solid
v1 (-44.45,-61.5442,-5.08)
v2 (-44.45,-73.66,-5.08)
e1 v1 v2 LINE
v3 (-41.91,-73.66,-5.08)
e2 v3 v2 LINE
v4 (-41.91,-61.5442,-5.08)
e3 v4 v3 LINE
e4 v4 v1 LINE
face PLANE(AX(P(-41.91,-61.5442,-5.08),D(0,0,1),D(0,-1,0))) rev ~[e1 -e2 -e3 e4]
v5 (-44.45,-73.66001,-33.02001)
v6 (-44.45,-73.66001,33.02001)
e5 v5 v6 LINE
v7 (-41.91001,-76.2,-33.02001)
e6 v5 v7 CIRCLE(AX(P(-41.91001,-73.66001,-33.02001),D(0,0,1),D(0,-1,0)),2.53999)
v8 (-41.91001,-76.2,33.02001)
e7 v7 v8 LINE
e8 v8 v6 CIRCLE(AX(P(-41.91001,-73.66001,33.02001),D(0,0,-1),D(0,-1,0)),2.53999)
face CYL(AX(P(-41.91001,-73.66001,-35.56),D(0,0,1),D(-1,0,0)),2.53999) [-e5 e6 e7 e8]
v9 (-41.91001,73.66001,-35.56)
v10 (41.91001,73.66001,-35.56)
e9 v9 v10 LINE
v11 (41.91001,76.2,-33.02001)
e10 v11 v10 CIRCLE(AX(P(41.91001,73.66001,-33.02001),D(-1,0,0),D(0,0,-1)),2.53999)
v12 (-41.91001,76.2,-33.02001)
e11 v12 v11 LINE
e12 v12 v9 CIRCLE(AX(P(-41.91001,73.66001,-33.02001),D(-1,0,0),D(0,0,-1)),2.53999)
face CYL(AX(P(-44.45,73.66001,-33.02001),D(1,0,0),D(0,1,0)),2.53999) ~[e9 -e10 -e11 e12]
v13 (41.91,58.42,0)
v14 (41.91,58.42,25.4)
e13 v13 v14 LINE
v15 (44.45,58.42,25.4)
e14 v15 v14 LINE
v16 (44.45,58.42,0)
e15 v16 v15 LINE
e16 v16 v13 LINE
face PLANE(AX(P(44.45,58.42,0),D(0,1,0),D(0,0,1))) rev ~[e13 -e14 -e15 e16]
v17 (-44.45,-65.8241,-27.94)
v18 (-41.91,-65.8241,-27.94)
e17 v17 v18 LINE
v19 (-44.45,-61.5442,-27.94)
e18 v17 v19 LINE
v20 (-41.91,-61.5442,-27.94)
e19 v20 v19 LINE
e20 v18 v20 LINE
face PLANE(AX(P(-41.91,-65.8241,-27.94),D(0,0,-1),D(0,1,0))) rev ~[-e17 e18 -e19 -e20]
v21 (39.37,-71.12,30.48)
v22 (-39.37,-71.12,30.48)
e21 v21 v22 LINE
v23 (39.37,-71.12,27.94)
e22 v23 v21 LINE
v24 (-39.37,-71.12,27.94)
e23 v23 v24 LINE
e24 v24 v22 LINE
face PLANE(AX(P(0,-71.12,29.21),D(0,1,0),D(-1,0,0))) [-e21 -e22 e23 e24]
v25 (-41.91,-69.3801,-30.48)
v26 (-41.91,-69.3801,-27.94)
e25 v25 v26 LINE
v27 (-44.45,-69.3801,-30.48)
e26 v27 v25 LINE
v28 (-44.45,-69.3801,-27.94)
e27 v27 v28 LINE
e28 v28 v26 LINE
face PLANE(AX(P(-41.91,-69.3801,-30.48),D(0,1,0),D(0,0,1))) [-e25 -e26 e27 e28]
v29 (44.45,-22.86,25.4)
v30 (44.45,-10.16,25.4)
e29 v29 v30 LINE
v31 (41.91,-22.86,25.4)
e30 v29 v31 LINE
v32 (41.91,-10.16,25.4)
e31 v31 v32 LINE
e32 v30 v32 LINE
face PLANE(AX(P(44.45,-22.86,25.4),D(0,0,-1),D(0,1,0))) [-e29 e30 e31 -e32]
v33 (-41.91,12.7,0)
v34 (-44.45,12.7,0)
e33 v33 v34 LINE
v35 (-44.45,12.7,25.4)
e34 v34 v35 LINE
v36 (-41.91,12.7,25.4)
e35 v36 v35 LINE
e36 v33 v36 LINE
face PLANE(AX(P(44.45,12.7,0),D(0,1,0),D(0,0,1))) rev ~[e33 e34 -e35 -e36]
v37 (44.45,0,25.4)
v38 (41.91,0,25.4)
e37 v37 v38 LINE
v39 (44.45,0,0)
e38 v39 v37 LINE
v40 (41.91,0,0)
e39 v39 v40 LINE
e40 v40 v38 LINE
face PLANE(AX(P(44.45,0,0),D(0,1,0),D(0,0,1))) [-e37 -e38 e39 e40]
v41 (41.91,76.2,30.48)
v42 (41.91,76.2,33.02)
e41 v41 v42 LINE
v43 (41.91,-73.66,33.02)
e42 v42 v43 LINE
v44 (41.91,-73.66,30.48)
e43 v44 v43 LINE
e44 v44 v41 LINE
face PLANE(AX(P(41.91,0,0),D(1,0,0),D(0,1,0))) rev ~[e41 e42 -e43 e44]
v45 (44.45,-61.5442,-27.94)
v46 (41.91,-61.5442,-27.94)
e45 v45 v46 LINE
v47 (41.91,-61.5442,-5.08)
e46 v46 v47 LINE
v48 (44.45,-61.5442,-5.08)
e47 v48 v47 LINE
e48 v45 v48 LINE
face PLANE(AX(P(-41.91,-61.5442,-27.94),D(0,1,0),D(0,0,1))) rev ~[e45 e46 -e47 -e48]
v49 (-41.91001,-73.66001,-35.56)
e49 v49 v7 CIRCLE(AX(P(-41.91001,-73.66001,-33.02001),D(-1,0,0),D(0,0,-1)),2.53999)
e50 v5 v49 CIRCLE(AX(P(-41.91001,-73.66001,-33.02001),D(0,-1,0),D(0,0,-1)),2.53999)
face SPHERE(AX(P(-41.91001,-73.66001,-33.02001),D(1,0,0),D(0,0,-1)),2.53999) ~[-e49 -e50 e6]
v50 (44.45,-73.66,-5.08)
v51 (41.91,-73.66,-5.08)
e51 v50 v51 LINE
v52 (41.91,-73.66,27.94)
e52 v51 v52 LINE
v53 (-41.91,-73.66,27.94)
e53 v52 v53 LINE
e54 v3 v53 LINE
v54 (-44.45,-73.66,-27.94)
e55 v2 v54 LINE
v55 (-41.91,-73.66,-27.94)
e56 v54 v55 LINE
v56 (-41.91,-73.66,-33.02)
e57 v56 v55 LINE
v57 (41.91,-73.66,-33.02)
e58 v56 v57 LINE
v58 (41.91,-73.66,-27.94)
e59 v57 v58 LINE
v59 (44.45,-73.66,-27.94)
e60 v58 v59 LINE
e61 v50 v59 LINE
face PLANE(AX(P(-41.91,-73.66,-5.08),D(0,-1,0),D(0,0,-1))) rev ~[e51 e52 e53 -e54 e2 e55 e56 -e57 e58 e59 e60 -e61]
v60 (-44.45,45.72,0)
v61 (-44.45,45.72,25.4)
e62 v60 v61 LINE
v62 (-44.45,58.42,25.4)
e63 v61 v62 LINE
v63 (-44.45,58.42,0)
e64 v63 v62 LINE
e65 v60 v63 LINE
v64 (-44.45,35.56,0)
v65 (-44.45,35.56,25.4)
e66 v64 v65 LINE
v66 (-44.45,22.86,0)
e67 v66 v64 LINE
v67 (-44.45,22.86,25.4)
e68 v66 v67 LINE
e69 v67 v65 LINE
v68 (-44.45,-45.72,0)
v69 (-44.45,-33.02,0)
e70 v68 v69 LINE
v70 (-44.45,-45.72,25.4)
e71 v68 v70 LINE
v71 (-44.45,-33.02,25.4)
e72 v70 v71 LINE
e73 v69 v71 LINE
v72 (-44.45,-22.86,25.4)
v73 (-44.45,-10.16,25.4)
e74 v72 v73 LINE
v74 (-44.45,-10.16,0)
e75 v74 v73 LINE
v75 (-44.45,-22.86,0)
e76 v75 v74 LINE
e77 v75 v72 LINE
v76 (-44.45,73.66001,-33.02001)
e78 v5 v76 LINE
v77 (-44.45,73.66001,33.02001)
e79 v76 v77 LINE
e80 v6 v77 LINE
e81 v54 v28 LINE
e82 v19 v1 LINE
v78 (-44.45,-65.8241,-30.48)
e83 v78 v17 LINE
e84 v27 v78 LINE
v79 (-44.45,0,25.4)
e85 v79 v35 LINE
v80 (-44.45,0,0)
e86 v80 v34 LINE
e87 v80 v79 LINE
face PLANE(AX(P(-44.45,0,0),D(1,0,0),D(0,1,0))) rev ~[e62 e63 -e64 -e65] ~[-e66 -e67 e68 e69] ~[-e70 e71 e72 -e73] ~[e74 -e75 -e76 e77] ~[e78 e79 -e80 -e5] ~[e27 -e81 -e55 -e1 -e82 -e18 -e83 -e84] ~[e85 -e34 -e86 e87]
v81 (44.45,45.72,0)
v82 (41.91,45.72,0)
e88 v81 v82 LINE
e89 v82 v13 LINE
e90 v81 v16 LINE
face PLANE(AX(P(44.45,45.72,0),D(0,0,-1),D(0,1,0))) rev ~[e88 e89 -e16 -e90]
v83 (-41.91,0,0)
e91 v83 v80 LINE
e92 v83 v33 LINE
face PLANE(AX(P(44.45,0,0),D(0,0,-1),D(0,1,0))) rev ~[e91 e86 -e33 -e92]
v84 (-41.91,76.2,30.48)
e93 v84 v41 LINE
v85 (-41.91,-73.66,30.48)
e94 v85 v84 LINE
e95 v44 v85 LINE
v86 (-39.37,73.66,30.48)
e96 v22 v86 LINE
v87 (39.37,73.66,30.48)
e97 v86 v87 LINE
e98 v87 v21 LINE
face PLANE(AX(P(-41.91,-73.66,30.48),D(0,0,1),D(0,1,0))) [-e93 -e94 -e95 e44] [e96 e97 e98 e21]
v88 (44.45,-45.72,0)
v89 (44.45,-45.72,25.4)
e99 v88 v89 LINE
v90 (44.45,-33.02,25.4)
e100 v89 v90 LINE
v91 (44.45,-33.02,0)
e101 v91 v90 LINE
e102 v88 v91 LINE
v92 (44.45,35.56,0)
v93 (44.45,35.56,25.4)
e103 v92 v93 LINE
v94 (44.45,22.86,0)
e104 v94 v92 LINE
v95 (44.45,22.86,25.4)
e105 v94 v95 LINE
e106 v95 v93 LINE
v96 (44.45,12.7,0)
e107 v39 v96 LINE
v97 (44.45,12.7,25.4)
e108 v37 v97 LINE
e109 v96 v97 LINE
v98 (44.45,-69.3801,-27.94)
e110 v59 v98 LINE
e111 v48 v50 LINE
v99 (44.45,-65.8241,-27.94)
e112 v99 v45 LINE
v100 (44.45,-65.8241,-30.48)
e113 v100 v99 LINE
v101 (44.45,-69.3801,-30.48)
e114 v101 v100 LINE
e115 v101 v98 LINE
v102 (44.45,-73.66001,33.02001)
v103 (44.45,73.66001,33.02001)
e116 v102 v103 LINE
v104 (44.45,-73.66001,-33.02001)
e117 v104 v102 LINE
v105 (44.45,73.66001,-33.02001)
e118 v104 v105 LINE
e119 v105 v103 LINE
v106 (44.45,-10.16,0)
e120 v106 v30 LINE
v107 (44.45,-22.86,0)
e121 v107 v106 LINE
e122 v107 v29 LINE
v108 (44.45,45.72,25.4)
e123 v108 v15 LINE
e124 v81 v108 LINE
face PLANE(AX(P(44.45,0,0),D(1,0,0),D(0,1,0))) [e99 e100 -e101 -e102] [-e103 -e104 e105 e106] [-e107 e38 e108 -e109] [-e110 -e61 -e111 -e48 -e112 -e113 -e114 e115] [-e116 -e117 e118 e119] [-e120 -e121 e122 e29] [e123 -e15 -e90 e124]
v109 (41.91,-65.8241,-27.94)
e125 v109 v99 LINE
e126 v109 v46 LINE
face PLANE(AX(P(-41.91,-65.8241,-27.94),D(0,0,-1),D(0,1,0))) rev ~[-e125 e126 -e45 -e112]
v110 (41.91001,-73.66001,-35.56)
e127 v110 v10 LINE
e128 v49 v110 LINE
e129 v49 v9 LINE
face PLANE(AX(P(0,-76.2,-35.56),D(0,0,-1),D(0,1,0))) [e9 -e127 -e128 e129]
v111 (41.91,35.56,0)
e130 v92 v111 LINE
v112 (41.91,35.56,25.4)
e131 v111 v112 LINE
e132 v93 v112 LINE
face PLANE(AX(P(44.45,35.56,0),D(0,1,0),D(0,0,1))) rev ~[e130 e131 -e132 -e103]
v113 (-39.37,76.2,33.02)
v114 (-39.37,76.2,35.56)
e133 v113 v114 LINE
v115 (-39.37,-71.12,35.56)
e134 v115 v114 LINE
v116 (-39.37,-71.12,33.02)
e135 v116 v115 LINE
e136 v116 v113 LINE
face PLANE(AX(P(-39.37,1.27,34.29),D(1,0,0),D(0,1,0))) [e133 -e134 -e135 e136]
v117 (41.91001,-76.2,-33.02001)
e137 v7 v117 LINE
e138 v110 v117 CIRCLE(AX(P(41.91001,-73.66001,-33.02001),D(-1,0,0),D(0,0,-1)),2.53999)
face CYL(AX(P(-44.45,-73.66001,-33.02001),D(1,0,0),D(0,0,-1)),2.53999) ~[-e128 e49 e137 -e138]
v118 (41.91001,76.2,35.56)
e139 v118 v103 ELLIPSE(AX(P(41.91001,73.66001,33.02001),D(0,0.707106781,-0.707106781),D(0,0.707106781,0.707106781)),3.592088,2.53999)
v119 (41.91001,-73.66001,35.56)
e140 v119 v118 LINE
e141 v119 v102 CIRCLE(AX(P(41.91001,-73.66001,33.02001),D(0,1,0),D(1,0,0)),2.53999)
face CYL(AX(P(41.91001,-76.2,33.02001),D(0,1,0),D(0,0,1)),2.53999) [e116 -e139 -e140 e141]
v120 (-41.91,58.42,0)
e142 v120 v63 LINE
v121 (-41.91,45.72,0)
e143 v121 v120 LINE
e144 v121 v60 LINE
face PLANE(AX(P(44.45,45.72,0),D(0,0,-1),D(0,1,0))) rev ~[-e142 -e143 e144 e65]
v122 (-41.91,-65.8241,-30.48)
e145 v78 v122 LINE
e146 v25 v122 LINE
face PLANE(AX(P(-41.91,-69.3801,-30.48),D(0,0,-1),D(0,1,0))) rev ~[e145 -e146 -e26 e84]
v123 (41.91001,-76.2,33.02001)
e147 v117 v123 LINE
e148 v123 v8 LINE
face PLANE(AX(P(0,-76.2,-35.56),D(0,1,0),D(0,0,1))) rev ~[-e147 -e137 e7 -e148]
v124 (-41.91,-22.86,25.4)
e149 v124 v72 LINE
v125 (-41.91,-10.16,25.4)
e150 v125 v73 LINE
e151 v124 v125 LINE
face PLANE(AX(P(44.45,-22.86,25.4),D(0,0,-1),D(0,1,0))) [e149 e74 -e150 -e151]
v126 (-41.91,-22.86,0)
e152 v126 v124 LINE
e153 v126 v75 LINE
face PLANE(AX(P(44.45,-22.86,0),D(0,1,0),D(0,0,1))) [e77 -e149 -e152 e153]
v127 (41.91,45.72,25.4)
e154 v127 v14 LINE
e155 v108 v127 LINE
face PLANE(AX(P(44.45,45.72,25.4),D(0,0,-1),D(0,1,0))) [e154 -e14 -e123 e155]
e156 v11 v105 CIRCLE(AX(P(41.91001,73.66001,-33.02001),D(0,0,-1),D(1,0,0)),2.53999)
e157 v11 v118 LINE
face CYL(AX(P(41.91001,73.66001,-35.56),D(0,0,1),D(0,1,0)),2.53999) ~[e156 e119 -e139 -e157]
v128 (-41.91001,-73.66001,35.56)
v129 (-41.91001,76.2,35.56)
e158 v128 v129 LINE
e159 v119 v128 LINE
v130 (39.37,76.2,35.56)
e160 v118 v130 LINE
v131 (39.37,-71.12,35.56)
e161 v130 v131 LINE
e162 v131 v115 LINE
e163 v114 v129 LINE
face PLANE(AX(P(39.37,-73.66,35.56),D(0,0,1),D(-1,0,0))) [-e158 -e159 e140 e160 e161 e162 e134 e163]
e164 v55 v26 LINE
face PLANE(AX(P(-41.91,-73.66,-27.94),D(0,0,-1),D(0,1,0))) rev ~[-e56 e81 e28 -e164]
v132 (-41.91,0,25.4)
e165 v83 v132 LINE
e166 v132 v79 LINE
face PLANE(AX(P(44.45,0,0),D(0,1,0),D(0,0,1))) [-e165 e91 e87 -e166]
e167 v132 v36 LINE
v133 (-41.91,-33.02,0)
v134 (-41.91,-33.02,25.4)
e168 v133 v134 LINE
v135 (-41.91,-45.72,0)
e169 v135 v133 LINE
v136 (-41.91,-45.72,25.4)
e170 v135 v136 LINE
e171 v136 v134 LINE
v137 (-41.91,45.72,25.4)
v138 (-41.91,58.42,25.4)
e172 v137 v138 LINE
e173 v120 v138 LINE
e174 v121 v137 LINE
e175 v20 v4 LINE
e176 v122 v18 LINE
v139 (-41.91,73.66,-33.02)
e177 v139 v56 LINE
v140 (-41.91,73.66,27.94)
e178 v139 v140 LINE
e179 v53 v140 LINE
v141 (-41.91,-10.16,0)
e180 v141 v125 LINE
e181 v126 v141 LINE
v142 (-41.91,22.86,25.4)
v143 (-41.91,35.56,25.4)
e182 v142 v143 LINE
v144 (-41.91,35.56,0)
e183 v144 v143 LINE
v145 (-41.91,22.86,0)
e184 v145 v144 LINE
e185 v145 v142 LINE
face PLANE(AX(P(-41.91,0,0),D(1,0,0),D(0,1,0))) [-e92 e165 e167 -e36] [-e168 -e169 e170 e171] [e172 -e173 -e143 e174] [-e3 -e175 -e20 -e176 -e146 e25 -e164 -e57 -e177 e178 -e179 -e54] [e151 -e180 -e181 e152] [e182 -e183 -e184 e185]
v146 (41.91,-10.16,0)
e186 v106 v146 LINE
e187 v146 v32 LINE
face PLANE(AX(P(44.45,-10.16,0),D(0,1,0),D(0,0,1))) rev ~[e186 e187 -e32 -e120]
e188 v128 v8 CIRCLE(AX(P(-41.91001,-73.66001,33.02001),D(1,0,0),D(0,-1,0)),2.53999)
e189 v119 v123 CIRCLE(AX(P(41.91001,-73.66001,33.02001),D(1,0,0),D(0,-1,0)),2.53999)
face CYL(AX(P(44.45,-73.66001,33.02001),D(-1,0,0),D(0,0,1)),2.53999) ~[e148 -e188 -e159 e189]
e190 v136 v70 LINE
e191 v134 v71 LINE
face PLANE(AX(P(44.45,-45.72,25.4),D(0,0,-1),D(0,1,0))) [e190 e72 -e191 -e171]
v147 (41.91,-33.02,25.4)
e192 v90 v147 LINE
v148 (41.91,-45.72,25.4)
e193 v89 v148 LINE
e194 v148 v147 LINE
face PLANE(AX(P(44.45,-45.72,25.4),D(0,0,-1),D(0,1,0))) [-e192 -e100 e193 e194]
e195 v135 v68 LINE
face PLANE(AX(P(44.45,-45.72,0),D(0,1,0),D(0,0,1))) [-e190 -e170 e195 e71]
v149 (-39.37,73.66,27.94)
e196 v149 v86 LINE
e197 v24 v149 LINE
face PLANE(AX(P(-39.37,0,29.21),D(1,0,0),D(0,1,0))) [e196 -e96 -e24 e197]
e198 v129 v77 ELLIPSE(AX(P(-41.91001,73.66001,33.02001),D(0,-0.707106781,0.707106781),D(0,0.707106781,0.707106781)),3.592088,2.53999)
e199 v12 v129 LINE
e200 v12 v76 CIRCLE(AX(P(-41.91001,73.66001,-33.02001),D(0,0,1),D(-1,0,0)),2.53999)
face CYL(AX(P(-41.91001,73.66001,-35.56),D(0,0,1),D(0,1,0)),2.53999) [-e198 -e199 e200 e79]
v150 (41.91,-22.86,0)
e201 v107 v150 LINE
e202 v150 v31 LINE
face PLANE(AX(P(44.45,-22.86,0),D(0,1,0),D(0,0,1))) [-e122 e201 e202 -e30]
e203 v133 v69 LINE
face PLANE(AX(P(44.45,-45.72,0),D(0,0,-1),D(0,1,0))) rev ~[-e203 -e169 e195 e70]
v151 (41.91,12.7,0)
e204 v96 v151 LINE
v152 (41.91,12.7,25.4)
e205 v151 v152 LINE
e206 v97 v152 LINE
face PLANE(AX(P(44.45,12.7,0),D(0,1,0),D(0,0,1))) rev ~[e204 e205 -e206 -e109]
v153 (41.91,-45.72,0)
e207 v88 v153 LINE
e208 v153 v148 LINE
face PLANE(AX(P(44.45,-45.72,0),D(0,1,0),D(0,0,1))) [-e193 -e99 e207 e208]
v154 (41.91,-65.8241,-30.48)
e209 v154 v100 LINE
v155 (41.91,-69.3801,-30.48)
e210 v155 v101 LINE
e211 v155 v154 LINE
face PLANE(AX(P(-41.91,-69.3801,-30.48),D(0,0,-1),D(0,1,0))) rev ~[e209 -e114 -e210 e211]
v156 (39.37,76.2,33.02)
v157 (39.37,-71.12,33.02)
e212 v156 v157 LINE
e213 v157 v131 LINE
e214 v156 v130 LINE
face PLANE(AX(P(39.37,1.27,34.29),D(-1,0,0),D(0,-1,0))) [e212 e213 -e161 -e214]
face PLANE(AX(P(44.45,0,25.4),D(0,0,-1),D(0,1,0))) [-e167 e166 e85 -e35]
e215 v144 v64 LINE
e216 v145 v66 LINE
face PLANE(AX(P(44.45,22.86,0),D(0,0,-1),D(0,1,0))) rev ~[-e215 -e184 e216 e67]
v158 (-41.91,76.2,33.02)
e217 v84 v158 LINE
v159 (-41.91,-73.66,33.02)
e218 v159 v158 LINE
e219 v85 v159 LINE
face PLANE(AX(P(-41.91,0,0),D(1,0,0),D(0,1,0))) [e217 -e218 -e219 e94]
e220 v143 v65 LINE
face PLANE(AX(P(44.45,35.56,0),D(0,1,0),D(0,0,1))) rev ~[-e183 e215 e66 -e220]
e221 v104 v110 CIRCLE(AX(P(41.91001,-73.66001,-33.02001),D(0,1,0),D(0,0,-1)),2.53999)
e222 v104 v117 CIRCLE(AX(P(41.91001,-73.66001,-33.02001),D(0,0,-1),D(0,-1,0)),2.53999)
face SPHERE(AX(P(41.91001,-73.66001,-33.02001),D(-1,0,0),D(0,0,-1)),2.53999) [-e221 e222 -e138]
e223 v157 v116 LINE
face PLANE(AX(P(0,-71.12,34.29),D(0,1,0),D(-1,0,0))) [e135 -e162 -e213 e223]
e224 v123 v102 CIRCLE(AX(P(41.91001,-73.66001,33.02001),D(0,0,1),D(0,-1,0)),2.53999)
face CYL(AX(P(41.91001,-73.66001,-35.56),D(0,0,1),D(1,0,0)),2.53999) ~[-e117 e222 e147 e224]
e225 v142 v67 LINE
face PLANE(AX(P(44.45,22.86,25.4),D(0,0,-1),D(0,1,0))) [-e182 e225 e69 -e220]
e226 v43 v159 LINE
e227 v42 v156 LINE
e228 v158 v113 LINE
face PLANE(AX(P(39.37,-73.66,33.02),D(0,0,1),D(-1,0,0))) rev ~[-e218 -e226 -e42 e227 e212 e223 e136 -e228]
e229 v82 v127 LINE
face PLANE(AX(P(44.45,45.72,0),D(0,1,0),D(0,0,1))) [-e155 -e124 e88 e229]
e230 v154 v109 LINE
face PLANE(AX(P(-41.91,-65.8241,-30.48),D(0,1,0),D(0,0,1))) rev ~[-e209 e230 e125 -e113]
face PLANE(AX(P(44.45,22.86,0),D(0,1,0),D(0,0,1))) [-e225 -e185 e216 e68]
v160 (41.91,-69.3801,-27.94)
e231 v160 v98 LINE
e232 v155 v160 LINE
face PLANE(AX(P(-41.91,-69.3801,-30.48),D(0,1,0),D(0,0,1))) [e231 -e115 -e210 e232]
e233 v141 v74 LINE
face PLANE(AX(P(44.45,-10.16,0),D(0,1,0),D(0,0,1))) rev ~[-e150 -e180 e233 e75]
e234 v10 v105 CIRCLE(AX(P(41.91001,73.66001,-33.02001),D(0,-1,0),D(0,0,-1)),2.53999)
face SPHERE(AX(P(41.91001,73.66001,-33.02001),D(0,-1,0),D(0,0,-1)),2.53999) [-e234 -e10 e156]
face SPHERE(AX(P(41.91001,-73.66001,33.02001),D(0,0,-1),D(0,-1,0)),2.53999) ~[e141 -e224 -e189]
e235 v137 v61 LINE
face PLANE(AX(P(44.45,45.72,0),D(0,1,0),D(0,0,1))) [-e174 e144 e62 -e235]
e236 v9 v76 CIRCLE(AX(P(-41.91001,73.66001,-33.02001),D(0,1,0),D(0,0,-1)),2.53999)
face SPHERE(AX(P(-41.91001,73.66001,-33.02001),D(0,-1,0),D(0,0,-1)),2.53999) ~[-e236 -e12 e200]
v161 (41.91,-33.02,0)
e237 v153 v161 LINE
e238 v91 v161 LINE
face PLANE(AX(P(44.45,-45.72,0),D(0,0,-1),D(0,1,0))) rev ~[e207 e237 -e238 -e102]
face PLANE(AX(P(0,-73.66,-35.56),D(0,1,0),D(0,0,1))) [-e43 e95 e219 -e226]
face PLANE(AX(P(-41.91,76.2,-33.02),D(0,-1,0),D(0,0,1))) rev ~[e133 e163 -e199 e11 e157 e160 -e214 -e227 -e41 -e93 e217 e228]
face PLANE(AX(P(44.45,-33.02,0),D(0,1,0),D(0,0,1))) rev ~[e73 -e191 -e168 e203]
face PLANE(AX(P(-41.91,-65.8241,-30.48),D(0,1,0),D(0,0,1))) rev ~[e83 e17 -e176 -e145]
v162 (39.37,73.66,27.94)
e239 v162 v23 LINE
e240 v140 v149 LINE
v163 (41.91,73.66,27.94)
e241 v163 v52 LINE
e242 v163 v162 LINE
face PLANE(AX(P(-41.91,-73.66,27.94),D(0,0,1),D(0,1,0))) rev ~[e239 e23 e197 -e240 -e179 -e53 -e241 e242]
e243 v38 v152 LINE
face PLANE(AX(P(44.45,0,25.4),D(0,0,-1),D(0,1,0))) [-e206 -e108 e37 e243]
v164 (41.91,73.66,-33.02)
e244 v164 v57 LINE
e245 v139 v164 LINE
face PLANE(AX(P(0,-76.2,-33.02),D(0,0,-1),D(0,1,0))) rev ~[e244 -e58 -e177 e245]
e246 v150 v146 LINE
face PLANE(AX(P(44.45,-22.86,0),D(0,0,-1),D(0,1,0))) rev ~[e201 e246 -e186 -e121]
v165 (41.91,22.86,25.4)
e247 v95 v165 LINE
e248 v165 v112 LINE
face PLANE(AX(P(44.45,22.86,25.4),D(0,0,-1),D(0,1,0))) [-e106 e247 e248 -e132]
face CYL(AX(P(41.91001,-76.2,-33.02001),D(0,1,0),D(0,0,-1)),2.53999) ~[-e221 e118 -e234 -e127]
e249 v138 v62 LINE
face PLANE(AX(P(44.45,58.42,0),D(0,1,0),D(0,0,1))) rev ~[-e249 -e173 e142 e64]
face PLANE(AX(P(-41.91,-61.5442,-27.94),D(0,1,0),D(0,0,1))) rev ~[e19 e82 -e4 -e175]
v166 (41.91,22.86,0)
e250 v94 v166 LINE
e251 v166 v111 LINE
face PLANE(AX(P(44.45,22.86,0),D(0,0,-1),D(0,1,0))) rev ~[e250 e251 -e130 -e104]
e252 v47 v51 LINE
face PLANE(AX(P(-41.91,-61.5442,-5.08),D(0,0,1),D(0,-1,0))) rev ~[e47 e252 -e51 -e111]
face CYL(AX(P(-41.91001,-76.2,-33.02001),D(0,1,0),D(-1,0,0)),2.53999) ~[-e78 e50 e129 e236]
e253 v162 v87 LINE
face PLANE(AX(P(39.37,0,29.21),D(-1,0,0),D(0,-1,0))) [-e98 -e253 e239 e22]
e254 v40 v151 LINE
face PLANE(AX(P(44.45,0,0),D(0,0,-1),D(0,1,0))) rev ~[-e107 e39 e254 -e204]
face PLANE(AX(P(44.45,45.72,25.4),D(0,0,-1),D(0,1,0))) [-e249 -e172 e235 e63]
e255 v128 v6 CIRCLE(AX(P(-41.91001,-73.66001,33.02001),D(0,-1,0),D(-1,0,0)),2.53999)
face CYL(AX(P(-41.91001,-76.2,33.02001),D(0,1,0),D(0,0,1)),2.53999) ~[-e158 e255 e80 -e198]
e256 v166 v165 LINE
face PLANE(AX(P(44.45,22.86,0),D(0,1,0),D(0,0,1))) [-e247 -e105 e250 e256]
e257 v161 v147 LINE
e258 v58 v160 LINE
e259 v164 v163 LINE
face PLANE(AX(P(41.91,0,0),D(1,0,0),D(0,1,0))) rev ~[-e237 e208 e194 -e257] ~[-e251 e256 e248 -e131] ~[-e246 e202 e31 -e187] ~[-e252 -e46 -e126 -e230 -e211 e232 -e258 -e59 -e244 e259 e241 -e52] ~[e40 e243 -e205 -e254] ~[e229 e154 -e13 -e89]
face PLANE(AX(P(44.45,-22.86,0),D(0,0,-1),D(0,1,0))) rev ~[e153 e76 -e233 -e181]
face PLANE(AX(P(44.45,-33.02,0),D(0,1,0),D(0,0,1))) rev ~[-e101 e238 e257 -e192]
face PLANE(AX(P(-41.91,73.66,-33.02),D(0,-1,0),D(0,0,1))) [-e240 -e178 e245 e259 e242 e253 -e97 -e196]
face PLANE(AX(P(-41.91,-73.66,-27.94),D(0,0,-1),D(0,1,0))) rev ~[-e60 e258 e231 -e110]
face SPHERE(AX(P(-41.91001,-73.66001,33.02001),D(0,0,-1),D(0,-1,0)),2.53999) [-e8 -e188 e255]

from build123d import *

# Parameters (mm, degrees)
F0_W      = 152.4
F0_H      = 71.12
F1_DEPTH  = 44.45
F2_T      = -2.54
F3_W      = 2.54
F3_H      = 63.5
F4_DEPTH  = 83.82
F5_W      = 147.32
F5_H      = 2.54
F5_W_2    = 149.86
F6_DEPTH  = 2.54
F7_W      = 147.32
F7_H      = 2.54
F7_W_2    = 149.86
F8_DEPTH  = 2.54
F9_W      = 78.74
F9_H      = 2.54
F10_DEPTH = 2.54
F11_W     = 3.556
F11_H     = 2.54
F12_DEPTH = 127
F13_R     = 2.53999
F14_W     = 12.7
F14_H     = 25.4
F15_DEPTH = 254


# Not quite as in the source:
# - a fillet or chamfer is up to 0.001 mm smaller than in the source, because OpenCascade refuses the exact size


with BuildPart() as f1:
    # F0 (on Right) → F1 (new body, symmetric)
    with BuildSketch(Plane.YZ):
        Rectangle(F0_W, F0_H)
    extrude(amount=F1_DEPTH, both=True)

    # F2
    f2_openings = [f1.faces().sort_by_distance(p)[0] for p in [
        (0, 0, 35.56),
        (0, 76.2, 0),
    ]]
    offset(amount=F2_T, openings=f2_openings)

    # F3 (on face) → F4 (join, through all)
    with BuildSketch(Plane.YZ.offset(-41.91)):
        with Locations((74.93, -1.27)):
            Rectangle(F3_W, F3_H)
    extrude(amount=F4_DEPTH)

    # F5 (on face) → F6 (join)
    with BuildSketch(Plane(origin=(41.91, 0, 0), x_dir=(0, -1, 0), z_dir=(-1, 0, 0))):
        with Locations((0, 29.21)):
            Rectangle(F5_W, F5_H)
        with Locations((-1.27, 34.29)):
            Rectangle(F5_W_2, F5_H)
    extrude(amount=F6_DEPTH)

    # F7 (on face) → F8 (join)
    with BuildSketch(Plane.YZ.offset(-41.91)):
        with Locations((0, 29.21)):
            Rectangle(F7_W, F7_H)
        with Locations((1.27, 34.29)):
            Rectangle(F7_W_2, F7_H)
    extrude(amount=F8_DEPTH)

    # F9 (on face) → F10 (join)
    with BuildSketch(Plane(origin=(0, -73.66, 0), x_dir=(-1, 0, 0), z_dir=(0, 1, 0))):
        with Locations((0, 34.29)):
            Rectangle(F9_W, F9_H)
        with Locations((0, 29.21)):
            Rectangle(F9_W, F9_H)
    extrude(amount=F10_DEPTH)

    # F11 (on face) → F12 (cut, symmetric)
    with BuildSketch(Plane.YZ.offset(-41.91)):
        Polygon((-73.66, -5.08), (-73.66, -27.94), (-69.3801, -27.94), (-69.3801, -25.4), (-65.8241, -25.4), (-65.8241, -27.94), (-61.5442, -27.94), (-61.5442, -5.08), align=None)
        with Locations((-67.6021, -26.67)):
            Rectangle(F11_W, F11_H)
        with Locations((-67.6021, -29.21)):
            Rectangle(F11_W, F11_H)
    extrude(amount=F12_DEPTH, both=True, mode=Mode.SUBTRACT)

    # F13 (radius 2.54 in the source; OpenCascade refuses exactly that, so slightly less here)
    f13_edges = [f1.edges().sort_by_distance(p)[0] for p in [
        (0, -76.2, -35.56),
        (-44.45, 0, -35.56),
        (44.45, 0, -35.56),
        (44.45, -76.2, 0),
        (-44.45, -76.2, 0),
        (0, 76.2, -35.56),
        (44.45, 76.2, 0),
        (-44.45, 76.2, 0),
        (0, -76.2, 35.56),
        (44.45, 0, 35.56),
        (-44.45, 0, 35.56),
    ]]
    fillet(f13_edges, radius=F13_R)

    # F14 (on face) → F15 (cut)
    with BuildSketch(Plane.YZ.offset(44.45)):
        with Locations((-39.37, 12.7)):
            Rectangle(F14_W, F14_H)
        with Locations((-16.51, 12.7)):
            Rectangle(F14_W, F14_H)
        with Locations((6.35, 12.7)):
            Rectangle(F14_W, F14_H)
        with Locations((29.21, 12.7)):
            Rectangle(F14_W, F14_H)
        with Locations((52.07, 12.7)):
            Rectangle(F14_W, F14_H)
    extrude(amount=-F15_DEPTH, mode=Mode.SUBTRACT)


solid = f1.part
